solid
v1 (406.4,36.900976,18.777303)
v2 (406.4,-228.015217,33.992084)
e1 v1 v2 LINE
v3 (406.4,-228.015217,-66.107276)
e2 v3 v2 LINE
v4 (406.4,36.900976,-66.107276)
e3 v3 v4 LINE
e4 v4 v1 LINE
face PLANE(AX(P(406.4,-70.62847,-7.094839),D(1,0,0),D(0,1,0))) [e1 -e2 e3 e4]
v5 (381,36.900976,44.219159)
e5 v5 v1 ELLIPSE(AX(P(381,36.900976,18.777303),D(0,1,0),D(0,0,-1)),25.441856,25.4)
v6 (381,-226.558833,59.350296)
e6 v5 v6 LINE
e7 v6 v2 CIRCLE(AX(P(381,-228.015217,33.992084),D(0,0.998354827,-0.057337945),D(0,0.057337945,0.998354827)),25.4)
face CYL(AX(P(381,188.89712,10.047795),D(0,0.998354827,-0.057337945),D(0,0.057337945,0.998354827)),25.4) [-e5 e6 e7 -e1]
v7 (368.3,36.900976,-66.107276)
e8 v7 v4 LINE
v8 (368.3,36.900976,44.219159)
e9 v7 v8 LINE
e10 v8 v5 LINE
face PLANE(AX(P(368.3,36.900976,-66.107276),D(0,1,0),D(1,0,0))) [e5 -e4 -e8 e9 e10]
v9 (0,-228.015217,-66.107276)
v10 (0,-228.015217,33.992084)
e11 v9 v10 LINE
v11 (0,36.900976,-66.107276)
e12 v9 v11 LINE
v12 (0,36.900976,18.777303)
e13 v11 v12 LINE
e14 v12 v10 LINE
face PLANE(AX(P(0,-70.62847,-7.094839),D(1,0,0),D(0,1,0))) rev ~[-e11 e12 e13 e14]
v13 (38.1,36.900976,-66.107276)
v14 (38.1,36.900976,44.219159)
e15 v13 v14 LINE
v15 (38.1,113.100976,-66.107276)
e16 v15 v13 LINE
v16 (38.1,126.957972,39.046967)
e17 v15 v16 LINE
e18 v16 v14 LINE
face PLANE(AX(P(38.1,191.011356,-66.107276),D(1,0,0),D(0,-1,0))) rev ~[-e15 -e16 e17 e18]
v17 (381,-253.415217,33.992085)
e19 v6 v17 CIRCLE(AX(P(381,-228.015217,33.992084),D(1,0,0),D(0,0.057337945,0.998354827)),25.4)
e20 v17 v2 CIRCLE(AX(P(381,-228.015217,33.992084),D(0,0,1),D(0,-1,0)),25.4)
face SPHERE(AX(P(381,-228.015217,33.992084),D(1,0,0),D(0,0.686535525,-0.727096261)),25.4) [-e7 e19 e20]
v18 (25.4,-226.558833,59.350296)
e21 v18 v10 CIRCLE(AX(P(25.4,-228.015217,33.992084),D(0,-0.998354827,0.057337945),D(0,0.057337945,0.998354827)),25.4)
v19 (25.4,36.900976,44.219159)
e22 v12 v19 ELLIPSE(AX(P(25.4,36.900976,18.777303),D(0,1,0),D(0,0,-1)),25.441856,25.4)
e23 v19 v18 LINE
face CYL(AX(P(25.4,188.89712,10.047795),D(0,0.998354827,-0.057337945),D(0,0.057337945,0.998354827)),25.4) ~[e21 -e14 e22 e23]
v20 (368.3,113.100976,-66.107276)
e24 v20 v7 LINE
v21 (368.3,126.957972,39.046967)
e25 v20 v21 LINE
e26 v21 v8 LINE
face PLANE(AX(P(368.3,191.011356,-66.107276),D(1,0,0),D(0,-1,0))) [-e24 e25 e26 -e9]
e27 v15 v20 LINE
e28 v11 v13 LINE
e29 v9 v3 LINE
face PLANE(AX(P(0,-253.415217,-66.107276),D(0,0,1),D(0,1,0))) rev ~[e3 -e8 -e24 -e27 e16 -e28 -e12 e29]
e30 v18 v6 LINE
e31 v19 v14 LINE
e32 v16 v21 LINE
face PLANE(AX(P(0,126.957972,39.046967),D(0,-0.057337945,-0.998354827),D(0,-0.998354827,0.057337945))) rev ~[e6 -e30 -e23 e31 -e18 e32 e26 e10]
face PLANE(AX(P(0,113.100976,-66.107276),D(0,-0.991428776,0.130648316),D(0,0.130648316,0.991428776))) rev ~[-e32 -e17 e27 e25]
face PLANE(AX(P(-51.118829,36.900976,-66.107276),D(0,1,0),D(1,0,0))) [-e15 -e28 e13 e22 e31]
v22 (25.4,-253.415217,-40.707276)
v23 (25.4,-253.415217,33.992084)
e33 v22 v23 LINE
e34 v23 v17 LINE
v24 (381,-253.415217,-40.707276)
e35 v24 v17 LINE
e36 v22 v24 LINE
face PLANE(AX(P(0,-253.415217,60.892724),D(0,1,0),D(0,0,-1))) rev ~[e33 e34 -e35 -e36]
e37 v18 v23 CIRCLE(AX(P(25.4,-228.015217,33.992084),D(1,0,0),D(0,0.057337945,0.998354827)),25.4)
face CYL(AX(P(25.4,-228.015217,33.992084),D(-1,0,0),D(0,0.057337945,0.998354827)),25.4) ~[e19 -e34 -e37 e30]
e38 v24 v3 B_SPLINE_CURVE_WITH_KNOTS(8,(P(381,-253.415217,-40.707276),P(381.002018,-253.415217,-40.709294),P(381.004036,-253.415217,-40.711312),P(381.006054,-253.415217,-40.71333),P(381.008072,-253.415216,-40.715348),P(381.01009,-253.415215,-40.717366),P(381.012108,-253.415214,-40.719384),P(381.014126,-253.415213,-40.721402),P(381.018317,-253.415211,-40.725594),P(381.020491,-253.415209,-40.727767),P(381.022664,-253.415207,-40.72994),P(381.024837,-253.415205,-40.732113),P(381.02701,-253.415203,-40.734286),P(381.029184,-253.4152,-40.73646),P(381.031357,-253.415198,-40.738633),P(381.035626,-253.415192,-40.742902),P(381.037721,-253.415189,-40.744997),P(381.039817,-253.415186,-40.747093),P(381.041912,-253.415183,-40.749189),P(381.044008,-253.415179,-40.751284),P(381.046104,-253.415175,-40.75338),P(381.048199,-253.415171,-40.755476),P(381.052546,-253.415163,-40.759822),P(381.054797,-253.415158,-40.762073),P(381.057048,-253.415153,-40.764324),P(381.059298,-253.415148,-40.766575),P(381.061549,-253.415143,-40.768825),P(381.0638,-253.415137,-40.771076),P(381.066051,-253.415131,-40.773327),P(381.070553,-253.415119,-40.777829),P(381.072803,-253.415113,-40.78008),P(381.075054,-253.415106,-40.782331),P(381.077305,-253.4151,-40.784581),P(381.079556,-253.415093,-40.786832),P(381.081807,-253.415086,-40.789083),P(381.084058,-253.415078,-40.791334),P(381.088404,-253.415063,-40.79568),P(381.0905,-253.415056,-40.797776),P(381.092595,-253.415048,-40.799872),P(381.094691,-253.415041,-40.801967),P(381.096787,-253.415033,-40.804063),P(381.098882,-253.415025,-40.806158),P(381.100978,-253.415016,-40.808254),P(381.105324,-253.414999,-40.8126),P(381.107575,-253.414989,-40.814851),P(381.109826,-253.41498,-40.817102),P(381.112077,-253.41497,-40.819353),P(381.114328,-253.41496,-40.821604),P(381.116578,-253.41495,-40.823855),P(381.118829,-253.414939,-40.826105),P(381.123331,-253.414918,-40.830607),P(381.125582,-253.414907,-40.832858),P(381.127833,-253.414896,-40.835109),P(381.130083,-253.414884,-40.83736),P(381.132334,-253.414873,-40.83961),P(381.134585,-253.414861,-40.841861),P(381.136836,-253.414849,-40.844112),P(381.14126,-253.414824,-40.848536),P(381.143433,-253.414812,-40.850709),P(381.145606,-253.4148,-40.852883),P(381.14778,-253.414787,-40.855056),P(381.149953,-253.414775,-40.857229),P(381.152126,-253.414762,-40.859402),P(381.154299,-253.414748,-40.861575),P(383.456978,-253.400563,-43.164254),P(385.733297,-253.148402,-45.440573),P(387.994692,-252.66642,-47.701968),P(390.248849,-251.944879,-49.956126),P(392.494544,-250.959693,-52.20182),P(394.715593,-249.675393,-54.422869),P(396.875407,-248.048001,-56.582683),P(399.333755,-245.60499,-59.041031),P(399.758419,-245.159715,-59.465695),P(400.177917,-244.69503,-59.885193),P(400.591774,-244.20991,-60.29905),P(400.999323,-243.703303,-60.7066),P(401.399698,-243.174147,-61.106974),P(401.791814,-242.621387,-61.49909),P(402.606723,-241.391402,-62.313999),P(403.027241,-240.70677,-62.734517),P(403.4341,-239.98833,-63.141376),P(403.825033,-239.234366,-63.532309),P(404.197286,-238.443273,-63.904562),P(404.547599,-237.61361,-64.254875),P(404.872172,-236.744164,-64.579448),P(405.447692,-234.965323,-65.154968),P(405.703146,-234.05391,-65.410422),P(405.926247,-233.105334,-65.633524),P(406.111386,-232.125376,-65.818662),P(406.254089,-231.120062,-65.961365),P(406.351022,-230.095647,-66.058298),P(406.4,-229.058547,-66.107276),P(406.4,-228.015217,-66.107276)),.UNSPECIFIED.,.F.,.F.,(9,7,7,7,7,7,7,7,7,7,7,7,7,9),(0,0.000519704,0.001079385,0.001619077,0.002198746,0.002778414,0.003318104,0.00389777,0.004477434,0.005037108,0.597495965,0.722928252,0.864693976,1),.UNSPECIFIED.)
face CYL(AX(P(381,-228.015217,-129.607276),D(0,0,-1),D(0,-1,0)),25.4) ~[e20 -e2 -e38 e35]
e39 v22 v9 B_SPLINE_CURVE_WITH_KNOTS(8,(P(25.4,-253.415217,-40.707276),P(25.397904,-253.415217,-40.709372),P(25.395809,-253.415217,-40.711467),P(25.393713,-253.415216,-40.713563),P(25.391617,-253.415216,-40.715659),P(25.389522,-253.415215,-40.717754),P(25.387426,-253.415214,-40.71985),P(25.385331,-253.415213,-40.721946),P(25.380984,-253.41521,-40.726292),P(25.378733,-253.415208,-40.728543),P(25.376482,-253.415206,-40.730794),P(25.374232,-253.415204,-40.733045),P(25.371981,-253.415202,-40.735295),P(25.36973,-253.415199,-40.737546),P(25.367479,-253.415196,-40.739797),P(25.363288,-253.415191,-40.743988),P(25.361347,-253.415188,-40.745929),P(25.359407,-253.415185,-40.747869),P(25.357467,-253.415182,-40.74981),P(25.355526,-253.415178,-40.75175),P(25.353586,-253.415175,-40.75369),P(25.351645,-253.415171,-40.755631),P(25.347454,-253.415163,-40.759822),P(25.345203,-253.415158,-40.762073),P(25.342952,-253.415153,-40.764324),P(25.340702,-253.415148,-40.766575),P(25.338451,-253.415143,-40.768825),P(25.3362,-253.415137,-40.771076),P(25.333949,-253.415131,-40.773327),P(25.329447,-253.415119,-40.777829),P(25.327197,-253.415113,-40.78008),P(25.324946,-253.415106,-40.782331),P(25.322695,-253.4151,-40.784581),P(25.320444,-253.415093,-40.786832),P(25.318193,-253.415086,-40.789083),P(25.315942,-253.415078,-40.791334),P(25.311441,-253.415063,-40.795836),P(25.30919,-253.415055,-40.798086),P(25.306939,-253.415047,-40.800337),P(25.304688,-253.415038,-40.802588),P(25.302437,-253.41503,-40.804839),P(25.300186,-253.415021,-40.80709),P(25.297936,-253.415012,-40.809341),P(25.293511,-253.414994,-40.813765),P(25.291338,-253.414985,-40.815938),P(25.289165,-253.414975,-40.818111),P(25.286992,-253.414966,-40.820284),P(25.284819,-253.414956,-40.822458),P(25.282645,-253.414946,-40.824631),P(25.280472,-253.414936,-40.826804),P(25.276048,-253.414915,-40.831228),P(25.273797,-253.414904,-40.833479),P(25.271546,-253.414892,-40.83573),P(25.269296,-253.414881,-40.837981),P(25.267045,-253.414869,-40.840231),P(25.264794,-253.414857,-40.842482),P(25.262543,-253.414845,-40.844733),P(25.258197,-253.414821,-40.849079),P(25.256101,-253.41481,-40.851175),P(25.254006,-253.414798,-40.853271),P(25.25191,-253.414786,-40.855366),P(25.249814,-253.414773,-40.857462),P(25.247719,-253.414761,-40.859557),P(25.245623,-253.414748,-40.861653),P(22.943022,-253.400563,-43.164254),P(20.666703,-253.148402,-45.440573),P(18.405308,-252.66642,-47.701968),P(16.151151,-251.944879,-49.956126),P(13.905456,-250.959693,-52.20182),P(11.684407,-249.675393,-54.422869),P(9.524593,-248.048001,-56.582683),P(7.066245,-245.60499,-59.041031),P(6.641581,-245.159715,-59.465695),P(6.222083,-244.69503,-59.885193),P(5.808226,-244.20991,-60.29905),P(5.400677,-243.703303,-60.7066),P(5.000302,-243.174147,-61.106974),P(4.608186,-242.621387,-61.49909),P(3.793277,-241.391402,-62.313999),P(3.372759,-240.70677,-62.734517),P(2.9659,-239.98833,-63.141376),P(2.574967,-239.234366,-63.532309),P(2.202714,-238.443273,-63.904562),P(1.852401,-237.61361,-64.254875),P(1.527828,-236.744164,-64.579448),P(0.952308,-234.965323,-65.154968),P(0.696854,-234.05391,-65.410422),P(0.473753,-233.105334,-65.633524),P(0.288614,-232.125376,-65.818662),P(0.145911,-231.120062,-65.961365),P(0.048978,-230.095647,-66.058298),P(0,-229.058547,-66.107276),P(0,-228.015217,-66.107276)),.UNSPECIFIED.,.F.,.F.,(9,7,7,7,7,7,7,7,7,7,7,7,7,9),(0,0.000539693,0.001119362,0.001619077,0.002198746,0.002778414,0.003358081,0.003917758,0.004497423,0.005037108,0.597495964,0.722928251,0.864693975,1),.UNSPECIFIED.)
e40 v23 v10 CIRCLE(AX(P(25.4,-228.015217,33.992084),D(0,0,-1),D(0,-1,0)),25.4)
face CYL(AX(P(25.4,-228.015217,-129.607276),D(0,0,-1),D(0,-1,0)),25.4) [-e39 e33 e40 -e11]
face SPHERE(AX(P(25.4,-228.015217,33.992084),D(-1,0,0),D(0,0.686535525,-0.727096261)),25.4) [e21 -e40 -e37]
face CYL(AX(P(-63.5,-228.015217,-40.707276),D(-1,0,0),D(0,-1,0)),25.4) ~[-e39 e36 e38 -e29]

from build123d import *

# Parameters (mm, degrees)
F1_DEPTH     = 406.4
F2_T1_DEPTH  = 417.5993599931
F2_T3_DEPTH  = 355.6
F2_T5_DEPTH  = 163.5993599931
F2_T7_DEPTH  = 533.4
F2_T12_DEPTH = 25.4
F2_T18_DEPTH = 25.4
F3_W         = 89.2188286402
F3_H         = 154.1103798959
F4_DEPTH     = 127


# Not quite as in the source:
# - a fillet or chamfer that OpenCascade refuses, or shapes differently, is made with other operations: its cross-section is extruded or revolved along the edge and cut away or added
# - a feature names something its author has since deleted; it is built from what else it names


with BuildPart() as f1:
    # F0 (on Right) → F1 (new body)
    with BuildSketch(Plane.YZ):
        Polygon((113.1009757519, -66.1072761975), (126.957971921, 39.0469668974), (-253.4152170727, 60.8927238025), (-253.4152170727, -66.1072761975), align=None)
    extrude(amount=F1_DEPTH)

    # F2: fillet of radius 25.4 on 6 edges, made by hand

    # F2_s2 → F2_t1 (cut)
    with BuildSketch(Plane(origin=(0, 187.7009218342, -10.780120229), x_dir=(1, 0, 0), z_dir=(0, -0.9983548268, 0.0573379446))):
        with BuildLine():
            ThreePointArc((25.4, 46.2622370369), (7.4394877579, 38.822749279), (0, 20.8622370369))
            Line((0, 20.8622370369), (0, 46.2622370369))
            Line((0, 46.2622370369), (25.4, 46.2622370369))
        make_face()
        with BuildLine():
            ThreePointArc((381, 46.2622370369), (398.9605122421, 38.822749279), (406.4, 20.8622370369))
            Line((406.4, 20.8622370369), (406.4, 46.2622370369))
            Line((406.4, 46.2622370369), (381, 46.2622370369))
        make_face()
    extrude(amount=F2_T1_DEPTH, mode=Mode.SUBTRACT)

    # F2_s4 → F2_t3 (cut)
    with BuildSketch(Plane.YZ.offset(25.4)):
        with BuildLine():
            ThreePointArc((-226.558833279, 59.3502963952), (-245.4532194187, 52.4603288172), (-253.4152170727, 33.9920837956))
            Line((-253.4152170727, 33.9920837956), (-253.4152170727, 60.8927238025))
            Line((-253.4152170727, 60.8927238025), (-226.558833279, 59.3502963952))
        make_face()
    extrude(amount=F2_T3_DEPTH, mode=Mode.SUBTRACT)

    # F2_s6 → F2_t5 (cut)
    with BuildSketch(Plane.XY.offset(-129.6072761975)):
        with BuildLine():
            ThreePointArc((25.4, -253.4152170727), (7.4394877579, -245.9757293148), (0, -228.0152170727))
            Line((0, -228.0152170727), (0, -253.4152170727))
            Line((0, -253.4152170727), (25.4, -253.4152170727))
        make_face()
        with BuildLine():
            ThreePointArc((381, -253.4152170727), (398.9605122421, -245.9757293148), (406.4, -228.0152170727))
            Line((406.4, -228.0152170727), (406.4, -253.4152170727))
            Line((406.4, -253.4152170727), (381, -253.4152170727))
        make_face()
    extrude(amount=F2_T5_DEPTH, mode=Mode.SUBTRACT)

    # F2_s8 → F2_t7 (cut)
    with BuildSketch(Plane.YZ.offset(-63.5)):
        with BuildLine():
            ThreePointArc((-253.4152170727, -40.7072761975), (-245.9757293148, -58.6677884397), (-228.0152170727, -66.1072761975))
            Line((-228.0152170727, -66.1072761975), (-253.4152170727, -66.1072761975))
            Line((-253.4152170727, -66.1072761975), (-253.4152170727, -40.7072761975))
        make_face()
    extrude(amount=F2_T7_DEPTH, mode=Mode.SUBTRACT)


with BuildPart() as f2_tool10:
    # F2_s11 → F2_t12 (new body)
    with BuildSketch(Plane.YZ.offset(25.4)):
        Polygon((-228.0152170727, 33.9920837956), (-226.558833279, 59.3502963952), (-253.4152170727, 60.8927238025), (-253.4152170727, 33.9920837956), align=None)
    extrude(amount=-F2_T12_DEPTH)

    # F2_s13 → F2_t14 (revolve, cut)
    with BuildSketch(Plane(origin=(25.4, -228.0152170727, 33.9920837956), x_dir=(0, 0.6865355254, -0.7270962607), z_dir=(0, 0.7270962607, 0.6865355254))):
        with BuildLine():
            ThreePointArc((0, -25.4), (25.4, 0), (0, 25.4))
            Line((0, 25.4), (0, -25.4))
        make_face()
    revolve(axis=Axis((25.4, -228.0152170727, 33.9920837956), (-1, 0, 0)), mode=Mode.SUBTRACT)


with BuildPart() as f1_1:
    add(f1.part)

    # F2_t9: cut F2_tool10
    add(f2_tool10.part, mode=Mode.SUBTRACT)


with BuildPart() as f2_tool16:
    # F2_s17 → F2_t18 (new body)
    with BuildSketch(Plane.YZ.offset(381)):
        Polygon((-228.0152170727, 33.9920837956), (-226.558833279, 59.3502963952), (-253.4152170727, 60.8927238025), (-253.4152170727, 33.9920837956), align=None)
    extrude(amount=F2_T18_DEPTH)

    # F2_s19 → F2_t20 (revolve, cut)
    with BuildSketch(Plane(origin=(381, -228.0152170727, 33.9920837956), x_dir=(0, 0.6865355254, -0.7270962607), z_dir=(0, -0.7270962607, -0.6865355254))):
        with BuildLine():
            ThreePointArc((0, -25.4), (25.4, 0), (0, 25.4))
            Line((0, 25.4), (0, -25.4))
        make_face()
    revolve(axis=Axis((381, -228.0152170727, 33.9920837956), (1, 0, 0)), mode=Mode.SUBTRACT)


with BuildPart() as f1_2:
    add(f1_1.part)

    # F2_t15: cut F2_tool16
    add(f2_tool16.part, mode=Mode.SUBTRACT)

    # F3 (on face) → F4 (cut)
    with BuildSketch(Plane(origin=(0, 0, -66.1072761975), x_dir=(1, 0, 0), z_dir=(0, 0, -1))):
        with Locations((-6.5094143201, -113.9561656998)):
            Rectangle(F3_W, F3_H)
        with Locations((412.9094143201, -113.9561656998)):
            Rectangle(F3_W, F3_H)
    extrude(amount=-F4_DEPTH, mode=Mode.SUBTRACT)


solid = f1_2.part
